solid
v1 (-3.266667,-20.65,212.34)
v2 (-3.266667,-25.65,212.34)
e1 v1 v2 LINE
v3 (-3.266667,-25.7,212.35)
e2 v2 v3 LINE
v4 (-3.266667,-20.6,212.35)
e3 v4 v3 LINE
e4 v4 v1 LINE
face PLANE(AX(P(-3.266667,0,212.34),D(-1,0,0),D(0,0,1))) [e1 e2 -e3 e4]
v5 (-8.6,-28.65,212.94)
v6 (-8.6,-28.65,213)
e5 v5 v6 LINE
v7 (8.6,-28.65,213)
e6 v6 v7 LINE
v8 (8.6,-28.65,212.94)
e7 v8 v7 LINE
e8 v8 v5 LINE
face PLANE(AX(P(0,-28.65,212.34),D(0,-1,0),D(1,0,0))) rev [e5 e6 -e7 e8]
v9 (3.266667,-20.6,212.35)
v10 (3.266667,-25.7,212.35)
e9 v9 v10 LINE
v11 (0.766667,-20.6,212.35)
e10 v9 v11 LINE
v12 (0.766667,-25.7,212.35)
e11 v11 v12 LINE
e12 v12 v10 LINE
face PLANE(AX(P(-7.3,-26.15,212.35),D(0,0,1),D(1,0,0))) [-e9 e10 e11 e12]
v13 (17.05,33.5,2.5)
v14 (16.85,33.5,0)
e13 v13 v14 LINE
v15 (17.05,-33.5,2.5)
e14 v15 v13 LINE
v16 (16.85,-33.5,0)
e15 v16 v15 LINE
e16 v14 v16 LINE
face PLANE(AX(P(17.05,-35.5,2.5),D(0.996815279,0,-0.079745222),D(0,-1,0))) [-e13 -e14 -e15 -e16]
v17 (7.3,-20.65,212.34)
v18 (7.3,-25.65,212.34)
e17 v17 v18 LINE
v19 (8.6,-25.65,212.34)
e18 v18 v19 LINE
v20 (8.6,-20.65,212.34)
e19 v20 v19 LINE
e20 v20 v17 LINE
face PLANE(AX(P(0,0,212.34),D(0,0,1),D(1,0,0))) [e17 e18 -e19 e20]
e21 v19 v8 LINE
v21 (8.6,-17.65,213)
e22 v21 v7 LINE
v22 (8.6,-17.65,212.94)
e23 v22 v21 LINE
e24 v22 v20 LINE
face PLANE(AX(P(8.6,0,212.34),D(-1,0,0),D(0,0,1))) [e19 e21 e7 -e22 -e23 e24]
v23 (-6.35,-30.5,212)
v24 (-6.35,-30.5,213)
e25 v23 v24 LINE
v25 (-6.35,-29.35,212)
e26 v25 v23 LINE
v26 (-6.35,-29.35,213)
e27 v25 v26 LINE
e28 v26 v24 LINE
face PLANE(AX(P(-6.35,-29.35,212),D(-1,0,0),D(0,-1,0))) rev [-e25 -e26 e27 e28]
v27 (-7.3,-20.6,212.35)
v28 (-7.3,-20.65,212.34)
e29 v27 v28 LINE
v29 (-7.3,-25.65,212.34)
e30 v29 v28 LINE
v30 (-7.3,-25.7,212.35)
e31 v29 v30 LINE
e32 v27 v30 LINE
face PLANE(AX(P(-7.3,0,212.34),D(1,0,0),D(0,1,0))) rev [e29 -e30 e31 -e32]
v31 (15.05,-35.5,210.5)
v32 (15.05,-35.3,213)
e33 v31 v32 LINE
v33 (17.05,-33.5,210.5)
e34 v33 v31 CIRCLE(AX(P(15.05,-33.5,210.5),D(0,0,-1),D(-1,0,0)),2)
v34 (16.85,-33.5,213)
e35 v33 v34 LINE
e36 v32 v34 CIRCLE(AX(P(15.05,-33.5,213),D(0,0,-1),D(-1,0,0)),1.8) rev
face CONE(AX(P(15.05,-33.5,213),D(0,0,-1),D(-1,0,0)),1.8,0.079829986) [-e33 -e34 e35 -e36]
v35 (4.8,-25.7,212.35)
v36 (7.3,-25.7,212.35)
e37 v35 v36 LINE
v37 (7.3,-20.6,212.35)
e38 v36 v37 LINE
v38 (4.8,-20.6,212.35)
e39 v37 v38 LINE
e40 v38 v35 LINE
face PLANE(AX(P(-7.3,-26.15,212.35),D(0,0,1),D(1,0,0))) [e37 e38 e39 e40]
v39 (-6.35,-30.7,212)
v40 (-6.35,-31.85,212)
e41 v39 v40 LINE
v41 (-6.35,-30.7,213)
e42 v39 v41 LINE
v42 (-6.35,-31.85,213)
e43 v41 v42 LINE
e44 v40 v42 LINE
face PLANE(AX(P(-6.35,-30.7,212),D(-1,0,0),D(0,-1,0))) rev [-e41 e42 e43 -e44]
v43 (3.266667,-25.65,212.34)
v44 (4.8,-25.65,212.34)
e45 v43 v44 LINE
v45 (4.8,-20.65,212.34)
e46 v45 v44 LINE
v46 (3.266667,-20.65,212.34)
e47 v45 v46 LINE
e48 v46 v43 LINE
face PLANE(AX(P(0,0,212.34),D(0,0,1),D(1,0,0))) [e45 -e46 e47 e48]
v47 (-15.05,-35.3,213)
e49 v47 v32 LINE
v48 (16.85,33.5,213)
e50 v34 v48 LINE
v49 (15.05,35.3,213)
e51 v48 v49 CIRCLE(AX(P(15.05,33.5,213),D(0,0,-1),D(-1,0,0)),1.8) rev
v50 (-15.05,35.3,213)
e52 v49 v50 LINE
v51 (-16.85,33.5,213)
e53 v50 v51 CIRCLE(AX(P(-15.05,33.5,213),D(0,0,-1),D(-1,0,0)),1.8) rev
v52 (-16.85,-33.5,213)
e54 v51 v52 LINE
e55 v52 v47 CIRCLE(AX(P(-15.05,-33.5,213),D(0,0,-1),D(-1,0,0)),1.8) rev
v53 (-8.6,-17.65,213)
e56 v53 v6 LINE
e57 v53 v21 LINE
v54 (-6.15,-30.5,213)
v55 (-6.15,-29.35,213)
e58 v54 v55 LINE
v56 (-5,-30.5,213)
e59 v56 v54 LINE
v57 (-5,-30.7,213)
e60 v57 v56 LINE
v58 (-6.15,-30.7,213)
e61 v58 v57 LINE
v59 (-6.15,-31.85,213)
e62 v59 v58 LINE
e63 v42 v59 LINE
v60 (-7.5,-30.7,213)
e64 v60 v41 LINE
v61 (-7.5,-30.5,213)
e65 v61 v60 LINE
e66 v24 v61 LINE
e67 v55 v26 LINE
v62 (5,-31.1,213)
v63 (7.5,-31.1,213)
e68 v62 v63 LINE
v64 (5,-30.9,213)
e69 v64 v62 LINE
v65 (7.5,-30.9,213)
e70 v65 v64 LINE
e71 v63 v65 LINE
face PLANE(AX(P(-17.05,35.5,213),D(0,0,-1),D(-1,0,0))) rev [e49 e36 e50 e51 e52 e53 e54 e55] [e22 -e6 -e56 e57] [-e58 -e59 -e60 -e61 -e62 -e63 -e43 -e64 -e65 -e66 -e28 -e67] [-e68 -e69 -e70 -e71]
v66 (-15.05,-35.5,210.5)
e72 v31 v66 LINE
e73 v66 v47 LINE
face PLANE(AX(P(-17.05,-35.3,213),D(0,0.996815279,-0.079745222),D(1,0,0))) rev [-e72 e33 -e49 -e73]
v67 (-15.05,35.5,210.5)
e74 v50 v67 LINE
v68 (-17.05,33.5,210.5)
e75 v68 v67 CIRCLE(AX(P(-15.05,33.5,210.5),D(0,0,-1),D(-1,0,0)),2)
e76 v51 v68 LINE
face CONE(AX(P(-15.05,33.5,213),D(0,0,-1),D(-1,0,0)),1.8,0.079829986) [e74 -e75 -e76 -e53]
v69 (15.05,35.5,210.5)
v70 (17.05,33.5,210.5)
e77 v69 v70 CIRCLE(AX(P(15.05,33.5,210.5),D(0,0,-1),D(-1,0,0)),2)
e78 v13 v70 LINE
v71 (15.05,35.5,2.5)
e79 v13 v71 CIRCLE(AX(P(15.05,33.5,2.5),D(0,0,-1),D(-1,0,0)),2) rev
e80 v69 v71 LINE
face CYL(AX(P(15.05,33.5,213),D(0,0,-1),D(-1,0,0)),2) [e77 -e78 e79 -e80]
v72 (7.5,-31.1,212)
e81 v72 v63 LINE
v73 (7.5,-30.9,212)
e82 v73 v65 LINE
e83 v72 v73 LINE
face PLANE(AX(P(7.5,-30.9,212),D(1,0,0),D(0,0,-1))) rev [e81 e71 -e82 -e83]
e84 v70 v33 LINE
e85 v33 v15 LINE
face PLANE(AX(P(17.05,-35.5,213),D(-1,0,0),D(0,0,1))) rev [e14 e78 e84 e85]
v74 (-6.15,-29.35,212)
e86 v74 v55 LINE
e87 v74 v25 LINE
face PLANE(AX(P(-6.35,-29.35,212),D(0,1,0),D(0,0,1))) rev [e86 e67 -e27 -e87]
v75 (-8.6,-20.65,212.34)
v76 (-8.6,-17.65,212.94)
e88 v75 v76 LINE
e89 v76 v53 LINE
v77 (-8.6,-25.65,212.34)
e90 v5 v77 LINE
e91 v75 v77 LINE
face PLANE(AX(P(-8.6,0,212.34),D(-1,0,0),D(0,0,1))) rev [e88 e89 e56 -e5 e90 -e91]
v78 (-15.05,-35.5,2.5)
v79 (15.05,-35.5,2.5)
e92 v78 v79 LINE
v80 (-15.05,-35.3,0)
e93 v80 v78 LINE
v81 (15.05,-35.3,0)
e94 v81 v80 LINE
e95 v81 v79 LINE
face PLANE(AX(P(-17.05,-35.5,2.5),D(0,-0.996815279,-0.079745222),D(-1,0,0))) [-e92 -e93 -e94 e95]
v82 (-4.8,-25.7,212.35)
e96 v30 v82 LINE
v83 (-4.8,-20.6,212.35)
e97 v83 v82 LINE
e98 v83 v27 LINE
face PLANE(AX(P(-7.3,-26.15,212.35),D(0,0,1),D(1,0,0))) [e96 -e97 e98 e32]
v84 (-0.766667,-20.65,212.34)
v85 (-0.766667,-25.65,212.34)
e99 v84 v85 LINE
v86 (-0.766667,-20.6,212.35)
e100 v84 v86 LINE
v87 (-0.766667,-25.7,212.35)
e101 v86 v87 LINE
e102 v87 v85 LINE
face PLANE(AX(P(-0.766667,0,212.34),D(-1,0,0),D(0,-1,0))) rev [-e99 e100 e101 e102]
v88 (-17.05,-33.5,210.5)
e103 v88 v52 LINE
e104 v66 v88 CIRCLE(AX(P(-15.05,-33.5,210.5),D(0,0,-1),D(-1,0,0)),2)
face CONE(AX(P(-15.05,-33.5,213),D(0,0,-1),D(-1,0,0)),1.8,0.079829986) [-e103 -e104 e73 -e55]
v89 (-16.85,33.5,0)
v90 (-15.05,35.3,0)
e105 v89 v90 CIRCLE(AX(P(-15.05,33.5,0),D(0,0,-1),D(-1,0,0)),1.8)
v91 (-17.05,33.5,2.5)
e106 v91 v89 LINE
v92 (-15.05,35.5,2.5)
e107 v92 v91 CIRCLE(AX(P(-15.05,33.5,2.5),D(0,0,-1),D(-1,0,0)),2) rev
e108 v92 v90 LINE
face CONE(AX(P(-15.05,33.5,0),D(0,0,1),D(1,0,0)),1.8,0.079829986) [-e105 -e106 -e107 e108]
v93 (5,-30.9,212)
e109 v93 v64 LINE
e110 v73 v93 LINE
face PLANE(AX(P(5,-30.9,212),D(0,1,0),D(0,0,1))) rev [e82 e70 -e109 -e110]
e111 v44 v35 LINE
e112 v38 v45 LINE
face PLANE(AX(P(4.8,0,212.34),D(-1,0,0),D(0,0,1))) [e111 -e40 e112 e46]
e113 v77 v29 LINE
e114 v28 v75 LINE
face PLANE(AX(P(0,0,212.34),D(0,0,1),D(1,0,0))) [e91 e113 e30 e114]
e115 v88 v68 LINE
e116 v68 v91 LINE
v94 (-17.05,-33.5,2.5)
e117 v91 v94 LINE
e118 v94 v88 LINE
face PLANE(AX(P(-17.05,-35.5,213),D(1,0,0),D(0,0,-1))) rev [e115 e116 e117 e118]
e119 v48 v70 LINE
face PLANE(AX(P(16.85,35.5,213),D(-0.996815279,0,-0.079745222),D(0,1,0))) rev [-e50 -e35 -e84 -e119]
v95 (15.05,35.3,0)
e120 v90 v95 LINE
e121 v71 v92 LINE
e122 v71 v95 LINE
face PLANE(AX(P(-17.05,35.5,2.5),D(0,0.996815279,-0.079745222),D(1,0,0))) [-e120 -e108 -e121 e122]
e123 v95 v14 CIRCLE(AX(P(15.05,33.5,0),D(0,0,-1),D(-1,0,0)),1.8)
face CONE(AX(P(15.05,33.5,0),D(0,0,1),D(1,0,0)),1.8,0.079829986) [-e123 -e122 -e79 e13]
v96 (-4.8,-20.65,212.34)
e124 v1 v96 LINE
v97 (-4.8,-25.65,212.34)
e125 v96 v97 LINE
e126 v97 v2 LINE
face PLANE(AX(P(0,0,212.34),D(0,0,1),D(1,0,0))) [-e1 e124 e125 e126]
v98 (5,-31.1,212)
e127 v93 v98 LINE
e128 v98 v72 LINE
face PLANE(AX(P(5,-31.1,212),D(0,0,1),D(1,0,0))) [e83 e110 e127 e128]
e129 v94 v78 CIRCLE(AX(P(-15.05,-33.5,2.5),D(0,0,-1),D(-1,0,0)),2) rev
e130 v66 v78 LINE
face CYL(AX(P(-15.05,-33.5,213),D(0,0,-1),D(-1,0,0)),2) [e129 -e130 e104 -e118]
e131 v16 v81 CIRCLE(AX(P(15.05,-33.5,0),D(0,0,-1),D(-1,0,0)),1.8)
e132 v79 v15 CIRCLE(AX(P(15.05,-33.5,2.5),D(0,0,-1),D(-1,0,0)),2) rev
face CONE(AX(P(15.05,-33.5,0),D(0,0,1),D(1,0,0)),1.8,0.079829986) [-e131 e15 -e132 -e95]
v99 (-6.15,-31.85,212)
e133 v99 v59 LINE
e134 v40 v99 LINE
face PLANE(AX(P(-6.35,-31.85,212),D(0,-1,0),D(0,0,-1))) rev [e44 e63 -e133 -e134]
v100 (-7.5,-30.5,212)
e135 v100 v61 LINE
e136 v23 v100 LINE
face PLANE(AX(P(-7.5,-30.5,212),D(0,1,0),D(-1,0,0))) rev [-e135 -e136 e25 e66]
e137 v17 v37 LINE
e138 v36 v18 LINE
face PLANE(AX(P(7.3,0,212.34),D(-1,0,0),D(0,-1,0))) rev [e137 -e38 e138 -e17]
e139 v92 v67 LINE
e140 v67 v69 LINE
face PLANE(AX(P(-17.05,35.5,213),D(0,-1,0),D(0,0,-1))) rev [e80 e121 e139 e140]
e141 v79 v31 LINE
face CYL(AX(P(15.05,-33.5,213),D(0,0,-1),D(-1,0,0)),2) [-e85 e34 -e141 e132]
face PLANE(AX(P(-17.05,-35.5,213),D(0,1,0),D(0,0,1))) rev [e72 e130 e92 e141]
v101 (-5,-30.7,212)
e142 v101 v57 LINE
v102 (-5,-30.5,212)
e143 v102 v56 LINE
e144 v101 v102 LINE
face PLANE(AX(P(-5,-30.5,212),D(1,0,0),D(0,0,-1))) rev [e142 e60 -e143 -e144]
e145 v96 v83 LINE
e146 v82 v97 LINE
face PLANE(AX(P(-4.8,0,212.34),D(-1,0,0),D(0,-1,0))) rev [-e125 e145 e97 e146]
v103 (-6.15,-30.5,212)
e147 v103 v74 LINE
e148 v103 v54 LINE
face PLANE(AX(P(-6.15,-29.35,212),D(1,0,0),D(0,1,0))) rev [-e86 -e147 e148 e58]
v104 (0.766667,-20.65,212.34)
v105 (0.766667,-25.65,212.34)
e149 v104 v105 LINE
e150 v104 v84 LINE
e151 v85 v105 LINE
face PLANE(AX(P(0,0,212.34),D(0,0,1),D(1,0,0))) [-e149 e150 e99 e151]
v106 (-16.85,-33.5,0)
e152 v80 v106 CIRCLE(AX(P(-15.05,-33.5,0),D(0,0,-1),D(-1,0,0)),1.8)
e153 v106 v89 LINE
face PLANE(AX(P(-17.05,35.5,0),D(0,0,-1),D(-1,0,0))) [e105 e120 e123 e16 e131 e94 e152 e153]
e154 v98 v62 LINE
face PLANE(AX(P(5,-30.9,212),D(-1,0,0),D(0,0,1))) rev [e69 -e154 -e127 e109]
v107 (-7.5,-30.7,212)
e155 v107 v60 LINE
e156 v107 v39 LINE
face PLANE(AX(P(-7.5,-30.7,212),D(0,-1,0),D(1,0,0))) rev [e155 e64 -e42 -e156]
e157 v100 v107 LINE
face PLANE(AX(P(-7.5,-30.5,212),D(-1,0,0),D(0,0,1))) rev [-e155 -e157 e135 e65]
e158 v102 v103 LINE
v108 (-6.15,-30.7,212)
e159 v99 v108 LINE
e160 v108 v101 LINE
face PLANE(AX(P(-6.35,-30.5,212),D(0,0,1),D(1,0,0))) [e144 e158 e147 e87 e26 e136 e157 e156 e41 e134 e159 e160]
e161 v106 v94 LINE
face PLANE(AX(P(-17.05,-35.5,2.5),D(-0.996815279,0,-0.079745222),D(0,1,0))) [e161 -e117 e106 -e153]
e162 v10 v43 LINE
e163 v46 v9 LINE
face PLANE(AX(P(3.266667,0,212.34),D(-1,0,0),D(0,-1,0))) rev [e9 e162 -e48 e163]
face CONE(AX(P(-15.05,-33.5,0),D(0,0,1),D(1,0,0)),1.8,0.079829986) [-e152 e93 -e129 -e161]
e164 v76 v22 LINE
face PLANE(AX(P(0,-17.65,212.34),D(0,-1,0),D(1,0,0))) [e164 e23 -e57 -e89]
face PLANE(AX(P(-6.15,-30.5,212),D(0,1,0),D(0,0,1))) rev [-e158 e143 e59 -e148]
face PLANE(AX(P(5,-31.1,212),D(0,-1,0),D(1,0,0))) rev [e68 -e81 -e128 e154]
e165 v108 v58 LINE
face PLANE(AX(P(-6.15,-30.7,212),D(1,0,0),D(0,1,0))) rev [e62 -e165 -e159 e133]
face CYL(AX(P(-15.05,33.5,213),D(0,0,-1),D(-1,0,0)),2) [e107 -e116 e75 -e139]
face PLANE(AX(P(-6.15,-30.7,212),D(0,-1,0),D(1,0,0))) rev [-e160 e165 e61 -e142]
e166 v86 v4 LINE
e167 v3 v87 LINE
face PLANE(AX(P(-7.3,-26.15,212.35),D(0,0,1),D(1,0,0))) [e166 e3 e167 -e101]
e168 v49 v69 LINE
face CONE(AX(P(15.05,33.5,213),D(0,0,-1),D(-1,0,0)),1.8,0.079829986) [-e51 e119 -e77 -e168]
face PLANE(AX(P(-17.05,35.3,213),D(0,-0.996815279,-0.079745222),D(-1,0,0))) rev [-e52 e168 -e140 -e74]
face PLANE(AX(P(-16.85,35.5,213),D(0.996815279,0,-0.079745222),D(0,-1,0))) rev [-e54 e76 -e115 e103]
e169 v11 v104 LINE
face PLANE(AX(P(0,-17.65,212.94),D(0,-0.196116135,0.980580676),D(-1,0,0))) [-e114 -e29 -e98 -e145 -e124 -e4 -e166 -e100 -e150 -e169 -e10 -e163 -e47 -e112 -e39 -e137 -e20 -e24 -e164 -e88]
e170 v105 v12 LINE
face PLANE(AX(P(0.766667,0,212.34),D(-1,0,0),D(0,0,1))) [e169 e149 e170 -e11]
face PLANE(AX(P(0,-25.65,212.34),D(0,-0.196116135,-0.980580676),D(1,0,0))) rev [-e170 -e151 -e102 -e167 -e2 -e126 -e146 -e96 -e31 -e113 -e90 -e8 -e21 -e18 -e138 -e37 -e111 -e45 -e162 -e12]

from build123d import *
from OCP.BRepFilletAPI import BRepFilletAPI_MakeChamfer

# Parameters (mm, degrees)
ESQUISSE1_W             = 34.1
ESQUISSE1_H             = 71
EXTRUSION1_DEPTH        = 213
ESQUISSE2_W             = 14.6
ESQUISSE2_H             = 6
ENL_V_MAT_EXTRU_1_DEPTH = 0.65
SKETCH1_W               = 2.5
SKETCH1_H               = 0.2
CUT_EXTRUDE1_DEPTH      = 1
SKETCH2_W               = 17.2
SKETCH2_H               = 11
SKETCH2_W_2             = 14.6
SKETCH2_H_2             = 6
SKETCH2_W_3             = 1.53333333
CUT_EXTRUDE2_DEPTH      = 0.66
CHAMFER1_SIZE           = 0.6
CHAMFER1_SIZE_2         = 3
FILLET1_R               = 2
CHAMFER2_SIZE           = 2.5
CHAMFER2_SIZE2          = 0.2
CHAMFER3_SIZE           = 2.5
CHAMFER3_SIZE2          = 0.2


with BuildPart() as part:
    # Esquisse1 → Extrusion1 (new body)
    with BuildSketch(Plane.XY):
        Rectangle(ESQUISSE1_W, ESQUISSE1_H)
    extrude(amount=EXTRUSION1_DEPTH)

    # Esquisse2 → Enlèv. mat.-Extru.1 (cut)
    with BuildSketch(Plane.XY.offset(213)):
        with Locations((0, -23.15)):
            Rectangle(ESQUISSE2_W, ESQUISSE2_H)
    extrude(amount=-ENL_V_MAT_EXTRU_1_DEPTH, mode=Mode.SUBTRACT)

    # Sketch1 → Cut-Extrude1 (cut)
    with BuildSketch(Plane.XY.offset(213)):
        Polygon((-6.35, -29.35), (-6.15, -29.35), (-6.15, -30.5), (-5, -30.5), (-5, -30.7), (-6.15, -30.7), (-6.15, -31.85), (-6.35, -31.85), (-6.35, -30.7), (-7.5, -30.7), (-7.5, -30.5), (-6.35, -30.5), align=None)
        with Locations((6.25, -31)):
            Rectangle(SKETCH1_W, SKETCH1_H)
    extrude(amount=-CUT_EXTRUDE1_DEPTH, mode=Mode.SUBTRACT)

    # Sketch2 → Cut-Extrude2 (cut)
    # profile 1 of 4: a face of its own
    with BuildSketch(Plane.XY.offset(213)):
        with Locations((0, -23.15)):
            Rectangle(SKETCH2_W, SKETCH2_H)
        with Locations((0, -23.15)):
            Rectangle(SKETCH2_W_2, SKETCH2_H_2, mode=Mode.SUBTRACT)
    # profile 2 of 4: a face of its own
    with BuildSketch(Plane.XY.offset(213)):
        with Locations((-4.033333335, -23.15)):
            Rectangle(SKETCH2_W_3, SKETCH2_H_2)
    # profile 3 of 4: a face of its own
    with BuildSketch(Plane.XY.offset(213)):
        with Locations((-5e-09, -23.15)):
            Rectangle(SKETCH2_W_3, SKETCH2_H_2)
    # profile 4 of 4: a face of its own
    with BuildSketch(Plane.XY.offset(213)):
        with Locations((4.033333325, -23.15)):
            Rectangle(SKETCH2_W_3, SKETCH2_H_2)
    extrude(amount=-CUT_EXTRUDE2_DEPTH, mode=Mode.SUBTRACT)

    # Chamfer1
    # the kernel refuses this chamfer: 3, 0.6 mm, written as the material it adds along each edge
    with BuildSketch(Plane(origin=(-16.394396259, -17.65, 212.34), x_dir=(0, 0.18544098588999497, 0.9826554028509418), z_dir=(1, 0, 0)), Plane(origin=(16.394396259, -28.65, 212.34), x_dir=(0, -0.18544098588999497, 0.9826554028509418), z_dir=(-1, 0, 0))) as chamfer1_piece_1:
        Polygon((CHAMFER1_SIZE * 0.982655402851, CHAMFER1_SIZE * 0.18544098589), (-CHAMFER1_SIZE_2 * 0.18544098589, CHAMFER1_SIZE_2 * 0.982655402851), (0, 0), align=None)
    extrude(amount=32.788792518)

    # Fillet1
    fillet1_edges = [part.edges().sort_by_distance(p)[0] for p in [
        (-17.05, 35.5, 106.5),
        (17.05, 35.5, 106.5),
        (17.05, -35.5, 106.5),
        (-17.05, -35.5, 106.5),
    ]]
    fillet(fillet1_edges, radius=FILLET1_R)

    # Chamfer2: one chamfer whose edges measure the first distance from different faces: ONE call of the kernel's chamfer builder (chamfer() names one face for all edges)
    chamfer2_edges_1 = [part.edges().sort_by_distance(p)[0] for p in [
        (0, -35.5, 213),
    ]]
    chamfer2_side_1 = [part.faces().sort_by_distance(p)[0] for p in [
        (0, -35.5, 106.5),
    ]]
    chamfer2_edges_2 = [part.edges().sort_by_distance(p)[0] for p in [
        (-17.05, 0, 213),
    ]]
    chamfer2_side_2 = [part.faces().sort_by_distance(p)[0] for p in [
        (-17.05, 0, 106.5),
    ]]
    chamfer2_edges_3 = [part.edges().sort_by_distance(p)[0] for p in [
        (17.05, 0, 213),
    ]]
    chamfer2_side_3 = [part.faces().sort_by_distance(p)[0] for p in [
        (17.05, 0, 106.5),
    ]]
    chamfer2_edges_4 = [part.edges().sort_by_distance(p)[0] for p in [
        (0, 35.5, 213),
    ]]
    chamfer2_side_4 = [part.faces().sort_by_distance(p)[0] for p in [
        (0, 35.5, 106.5),
    ]]
    chamfer2_edges_5 = [part.edges().sort_by_distance(p)[0] for p in [
        (-16.464213562, 34.914213562, 213),
    ]]
    chamfer2_side_5 = [part.faces().sort_by_distance(p)[0] for p in [
        (-16.464213562, 34.914213562, 106.5),
    ]]
    chamfer2_edges_6 = [part.edges().sort_by_distance(p)[0] for p in [
        (16.464213562, 34.914213562, 213),
    ]]
    chamfer2_side_6 = [part.faces().sort_by_distance(p)[0] for p in [
        (16.464213562, 34.914213562, 106.5),
    ]]
    chamfer2_edges_7 = [part.edges().sort_by_distance(p)[0] for p in [
        (16.464213562, -34.914213562, 213),
    ]]
    chamfer2_side_7 = [part.faces().sort_by_distance(p)[0] for p in [
        (16.464213562, -34.914213562, 106.5),
    ]]
    chamfer2_edges_8 = [part.edges().sort_by_distance(p)[0] for p in [
        (-16.464213562, -34.914213562, 213),
    ]]
    chamfer2_side_8 = [part.faces().sort_by_distance(p)[0] for p in [
        (-16.464213562, -34.914213562, 106.5),
    ]]
    chamfer2 = BRepFilletAPI_MakeChamfer(part.part.solid().wrapped)
    for e in chamfer2_edges_1:
        chamfer2.Add(CHAMFER2_SIZE, CHAMFER2_SIZE2, e.wrapped, chamfer2_side_1[0].wrapped)  # the first distance lies on this face
    for e in chamfer2_edges_2:
        chamfer2.Add(CHAMFER2_SIZE, CHAMFER2_SIZE2, e.wrapped, chamfer2_side_2[0].wrapped)  # the first distance lies on this face
    for e in chamfer2_edges_3:
        chamfer2.Add(CHAMFER2_SIZE, CHAMFER2_SIZE2, e.wrapped, chamfer2_side_3[0].wrapped)  # the first distance lies on this face
    for e in chamfer2_edges_4:
        chamfer2.Add(CHAMFER2_SIZE, CHAMFER2_SIZE2, e.wrapped, chamfer2_side_4[0].wrapped)  # the first distance lies on this face
    for e in chamfer2_edges_5:
        chamfer2.Add(CHAMFER2_SIZE, CHAMFER2_SIZE2, e.wrapped, chamfer2_side_5[0].wrapped)  # the first distance lies on this face
    for e in chamfer2_edges_6:
        chamfer2.Add(CHAMFER2_SIZE, CHAMFER2_SIZE2, e.wrapped, chamfer2_side_6[0].wrapped)  # the first distance lies on this face
    for e in chamfer2_edges_7:
        chamfer2.Add(CHAMFER2_SIZE, CHAMFER2_SIZE2, e.wrapped, chamfer2_side_7[0].wrapped)  # the first distance lies on this face
    for e in chamfer2_edges_8:
        chamfer2.Add(CHAMFER2_SIZE, CHAMFER2_SIZE2, e.wrapped, chamfer2_side_8[0].wrapped)  # the first distance lies on this face
    add(Compound.cast(chamfer2.Shape()), mode=Mode.REPLACE)

    # Chamfer3: one chamfer whose edges measure the first distance from different faces: ONE call of the kernel's chamfer builder (chamfer() names one face for all edges)
    chamfer3_edges_1 = [part.edges().sort_by_distance(p)[0] for p in [
        (0, -35.5, 0),
    ]]
    chamfer3_side_1 = [part.faces().sort_by_distance(p)[0] for p in [
        (0, -35.5, 105.25),
    ]]
    chamfer3_edges_2 = [part.edges().sort_by_distance(p)[0] for p in [
        (-17.05, 0, 0),
    ]]
    chamfer3_side_2 = [part.faces().sort_by_distance(p)[0] for p in [
        (-17.05, 0, 105.25),
    ]]
    chamfer3_edges_3 = [part.edges().sort_by_distance(p)[0] for p in [
        (0, 35.5, 0),
    ]]
    chamfer3_side_3 = [part.faces().sort_by_distance(p)[0] for p in [
        (0, 35.5, 105.25),
    ]]
    chamfer3_edges_4 = [part.edges().sort_by_distance(p)[0] for p in [
        (17.05, 0, 0),
    ]]
    chamfer3_side_4 = [part.faces().sort_by_distance(p)[0] for p in [
        (17.05, 0, 105.25),
    ]]
    chamfer3_edges_5 = [part.edges().sort_by_distance(p)[0] for p in [
        (-16.464213562, 34.914213562, 0),
    ]]
    chamfer3_side_5 = [part.faces().sort_by_distance(p)[0] for p in [
        (-16.464213562, 34.914213562, 105.25),
    ]]
    chamfer3_edges_6 = [part.edges().sort_by_distance(p)[0] for p in [
        (16.464213562, 34.914213562, 0),
    ]]
    chamfer3_side_6 = [part.faces().sort_by_distance(p)[0] for p in [
        (16.464213562, 34.914213562, 105.25),
    ]]
    chamfer3_edges_7 = [part.edges().sort_by_distance(p)[0] for p in [
        (16.464213562, -34.914213562, 0),
    ]]
    chamfer3_side_7 = [part.faces().sort_by_distance(p)[0] for p in [
        (16.464213562, -34.914213562, 105.25),
    ]]
    chamfer3_edges_8 = [part.edges().sort_by_distance(p)[0] for p in [
        (-16.464213562, -34.914213562, 0),
    ]]
    chamfer3_side_8 = [part.faces().sort_by_distance(p)[0] for p in [
        (-16.464213562, -34.914213562, 105.25),
    ]]
    chamfer3 = BRepFilletAPI_MakeChamfer(part.part.solid().wrapped)
    for e in chamfer3_edges_1:
        chamfer3.Add(CHAMFER3_SIZE, CHAMFER3_SIZE2, e.wrapped, chamfer3_side_1[0].wrapped)  # the first distance lies on this face
    for e in chamfer3_edges_2:
        chamfer3.Add(CHAMFER3_SIZE, CHAMFER3_SIZE2, e.wrapped, chamfer3_side_2[0].wrapped)  # the first distance lies on this face
    for e in chamfer3_edges_3:
        chamfer3.Add(CHAMFER3_SIZE, CHAMFER3_SIZE2, e.wrapped, chamfer3_side_3[0].wrapped)  # the first distance lies on this face
    for e in chamfer3_edges_4:
        chamfer3.Add(CHAMFER3_SIZE, CHAMFER3_SIZE2, e.wrapped, chamfer3_side_4[0].wrapped)  # the first distance lies on this face
    for e in chamfer3_edges_5:
        chamfer3.Add(CHAMFER3_SIZE, CHAMFER3_SIZE2, e.wrapped, chamfer3_side_5[0].wrapped)  # the first distance lies on this face
    for e in chamfer3_edges_6:
        chamfer3.Add(CHAMFER3_SIZE, CHAMFER3_SIZE2, e.wrapped, chamfer3_side_6[0].wrapped)  # the first distance lies on this face
    for e in chamfer3_edges_7:
        chamfer3.Add(CHAMFER3_SIZE, CHAMFER3_SIZE2, e.wrapped, chamfer3_side_7[0].wrapped)  # the first distance lies on this face
    for e in chamfer3_edges_8:
        chamfer3.Add(CHAMFER3_SIZE, CHAMFER3_SIZE2, e.wrapped, chamfer3_side_8[0].wrapped)  # the first distance lies on this face
    add(Compound.cast(chamfer3.Shape()), mode=Mode.REPLACE)


solid = part.part
